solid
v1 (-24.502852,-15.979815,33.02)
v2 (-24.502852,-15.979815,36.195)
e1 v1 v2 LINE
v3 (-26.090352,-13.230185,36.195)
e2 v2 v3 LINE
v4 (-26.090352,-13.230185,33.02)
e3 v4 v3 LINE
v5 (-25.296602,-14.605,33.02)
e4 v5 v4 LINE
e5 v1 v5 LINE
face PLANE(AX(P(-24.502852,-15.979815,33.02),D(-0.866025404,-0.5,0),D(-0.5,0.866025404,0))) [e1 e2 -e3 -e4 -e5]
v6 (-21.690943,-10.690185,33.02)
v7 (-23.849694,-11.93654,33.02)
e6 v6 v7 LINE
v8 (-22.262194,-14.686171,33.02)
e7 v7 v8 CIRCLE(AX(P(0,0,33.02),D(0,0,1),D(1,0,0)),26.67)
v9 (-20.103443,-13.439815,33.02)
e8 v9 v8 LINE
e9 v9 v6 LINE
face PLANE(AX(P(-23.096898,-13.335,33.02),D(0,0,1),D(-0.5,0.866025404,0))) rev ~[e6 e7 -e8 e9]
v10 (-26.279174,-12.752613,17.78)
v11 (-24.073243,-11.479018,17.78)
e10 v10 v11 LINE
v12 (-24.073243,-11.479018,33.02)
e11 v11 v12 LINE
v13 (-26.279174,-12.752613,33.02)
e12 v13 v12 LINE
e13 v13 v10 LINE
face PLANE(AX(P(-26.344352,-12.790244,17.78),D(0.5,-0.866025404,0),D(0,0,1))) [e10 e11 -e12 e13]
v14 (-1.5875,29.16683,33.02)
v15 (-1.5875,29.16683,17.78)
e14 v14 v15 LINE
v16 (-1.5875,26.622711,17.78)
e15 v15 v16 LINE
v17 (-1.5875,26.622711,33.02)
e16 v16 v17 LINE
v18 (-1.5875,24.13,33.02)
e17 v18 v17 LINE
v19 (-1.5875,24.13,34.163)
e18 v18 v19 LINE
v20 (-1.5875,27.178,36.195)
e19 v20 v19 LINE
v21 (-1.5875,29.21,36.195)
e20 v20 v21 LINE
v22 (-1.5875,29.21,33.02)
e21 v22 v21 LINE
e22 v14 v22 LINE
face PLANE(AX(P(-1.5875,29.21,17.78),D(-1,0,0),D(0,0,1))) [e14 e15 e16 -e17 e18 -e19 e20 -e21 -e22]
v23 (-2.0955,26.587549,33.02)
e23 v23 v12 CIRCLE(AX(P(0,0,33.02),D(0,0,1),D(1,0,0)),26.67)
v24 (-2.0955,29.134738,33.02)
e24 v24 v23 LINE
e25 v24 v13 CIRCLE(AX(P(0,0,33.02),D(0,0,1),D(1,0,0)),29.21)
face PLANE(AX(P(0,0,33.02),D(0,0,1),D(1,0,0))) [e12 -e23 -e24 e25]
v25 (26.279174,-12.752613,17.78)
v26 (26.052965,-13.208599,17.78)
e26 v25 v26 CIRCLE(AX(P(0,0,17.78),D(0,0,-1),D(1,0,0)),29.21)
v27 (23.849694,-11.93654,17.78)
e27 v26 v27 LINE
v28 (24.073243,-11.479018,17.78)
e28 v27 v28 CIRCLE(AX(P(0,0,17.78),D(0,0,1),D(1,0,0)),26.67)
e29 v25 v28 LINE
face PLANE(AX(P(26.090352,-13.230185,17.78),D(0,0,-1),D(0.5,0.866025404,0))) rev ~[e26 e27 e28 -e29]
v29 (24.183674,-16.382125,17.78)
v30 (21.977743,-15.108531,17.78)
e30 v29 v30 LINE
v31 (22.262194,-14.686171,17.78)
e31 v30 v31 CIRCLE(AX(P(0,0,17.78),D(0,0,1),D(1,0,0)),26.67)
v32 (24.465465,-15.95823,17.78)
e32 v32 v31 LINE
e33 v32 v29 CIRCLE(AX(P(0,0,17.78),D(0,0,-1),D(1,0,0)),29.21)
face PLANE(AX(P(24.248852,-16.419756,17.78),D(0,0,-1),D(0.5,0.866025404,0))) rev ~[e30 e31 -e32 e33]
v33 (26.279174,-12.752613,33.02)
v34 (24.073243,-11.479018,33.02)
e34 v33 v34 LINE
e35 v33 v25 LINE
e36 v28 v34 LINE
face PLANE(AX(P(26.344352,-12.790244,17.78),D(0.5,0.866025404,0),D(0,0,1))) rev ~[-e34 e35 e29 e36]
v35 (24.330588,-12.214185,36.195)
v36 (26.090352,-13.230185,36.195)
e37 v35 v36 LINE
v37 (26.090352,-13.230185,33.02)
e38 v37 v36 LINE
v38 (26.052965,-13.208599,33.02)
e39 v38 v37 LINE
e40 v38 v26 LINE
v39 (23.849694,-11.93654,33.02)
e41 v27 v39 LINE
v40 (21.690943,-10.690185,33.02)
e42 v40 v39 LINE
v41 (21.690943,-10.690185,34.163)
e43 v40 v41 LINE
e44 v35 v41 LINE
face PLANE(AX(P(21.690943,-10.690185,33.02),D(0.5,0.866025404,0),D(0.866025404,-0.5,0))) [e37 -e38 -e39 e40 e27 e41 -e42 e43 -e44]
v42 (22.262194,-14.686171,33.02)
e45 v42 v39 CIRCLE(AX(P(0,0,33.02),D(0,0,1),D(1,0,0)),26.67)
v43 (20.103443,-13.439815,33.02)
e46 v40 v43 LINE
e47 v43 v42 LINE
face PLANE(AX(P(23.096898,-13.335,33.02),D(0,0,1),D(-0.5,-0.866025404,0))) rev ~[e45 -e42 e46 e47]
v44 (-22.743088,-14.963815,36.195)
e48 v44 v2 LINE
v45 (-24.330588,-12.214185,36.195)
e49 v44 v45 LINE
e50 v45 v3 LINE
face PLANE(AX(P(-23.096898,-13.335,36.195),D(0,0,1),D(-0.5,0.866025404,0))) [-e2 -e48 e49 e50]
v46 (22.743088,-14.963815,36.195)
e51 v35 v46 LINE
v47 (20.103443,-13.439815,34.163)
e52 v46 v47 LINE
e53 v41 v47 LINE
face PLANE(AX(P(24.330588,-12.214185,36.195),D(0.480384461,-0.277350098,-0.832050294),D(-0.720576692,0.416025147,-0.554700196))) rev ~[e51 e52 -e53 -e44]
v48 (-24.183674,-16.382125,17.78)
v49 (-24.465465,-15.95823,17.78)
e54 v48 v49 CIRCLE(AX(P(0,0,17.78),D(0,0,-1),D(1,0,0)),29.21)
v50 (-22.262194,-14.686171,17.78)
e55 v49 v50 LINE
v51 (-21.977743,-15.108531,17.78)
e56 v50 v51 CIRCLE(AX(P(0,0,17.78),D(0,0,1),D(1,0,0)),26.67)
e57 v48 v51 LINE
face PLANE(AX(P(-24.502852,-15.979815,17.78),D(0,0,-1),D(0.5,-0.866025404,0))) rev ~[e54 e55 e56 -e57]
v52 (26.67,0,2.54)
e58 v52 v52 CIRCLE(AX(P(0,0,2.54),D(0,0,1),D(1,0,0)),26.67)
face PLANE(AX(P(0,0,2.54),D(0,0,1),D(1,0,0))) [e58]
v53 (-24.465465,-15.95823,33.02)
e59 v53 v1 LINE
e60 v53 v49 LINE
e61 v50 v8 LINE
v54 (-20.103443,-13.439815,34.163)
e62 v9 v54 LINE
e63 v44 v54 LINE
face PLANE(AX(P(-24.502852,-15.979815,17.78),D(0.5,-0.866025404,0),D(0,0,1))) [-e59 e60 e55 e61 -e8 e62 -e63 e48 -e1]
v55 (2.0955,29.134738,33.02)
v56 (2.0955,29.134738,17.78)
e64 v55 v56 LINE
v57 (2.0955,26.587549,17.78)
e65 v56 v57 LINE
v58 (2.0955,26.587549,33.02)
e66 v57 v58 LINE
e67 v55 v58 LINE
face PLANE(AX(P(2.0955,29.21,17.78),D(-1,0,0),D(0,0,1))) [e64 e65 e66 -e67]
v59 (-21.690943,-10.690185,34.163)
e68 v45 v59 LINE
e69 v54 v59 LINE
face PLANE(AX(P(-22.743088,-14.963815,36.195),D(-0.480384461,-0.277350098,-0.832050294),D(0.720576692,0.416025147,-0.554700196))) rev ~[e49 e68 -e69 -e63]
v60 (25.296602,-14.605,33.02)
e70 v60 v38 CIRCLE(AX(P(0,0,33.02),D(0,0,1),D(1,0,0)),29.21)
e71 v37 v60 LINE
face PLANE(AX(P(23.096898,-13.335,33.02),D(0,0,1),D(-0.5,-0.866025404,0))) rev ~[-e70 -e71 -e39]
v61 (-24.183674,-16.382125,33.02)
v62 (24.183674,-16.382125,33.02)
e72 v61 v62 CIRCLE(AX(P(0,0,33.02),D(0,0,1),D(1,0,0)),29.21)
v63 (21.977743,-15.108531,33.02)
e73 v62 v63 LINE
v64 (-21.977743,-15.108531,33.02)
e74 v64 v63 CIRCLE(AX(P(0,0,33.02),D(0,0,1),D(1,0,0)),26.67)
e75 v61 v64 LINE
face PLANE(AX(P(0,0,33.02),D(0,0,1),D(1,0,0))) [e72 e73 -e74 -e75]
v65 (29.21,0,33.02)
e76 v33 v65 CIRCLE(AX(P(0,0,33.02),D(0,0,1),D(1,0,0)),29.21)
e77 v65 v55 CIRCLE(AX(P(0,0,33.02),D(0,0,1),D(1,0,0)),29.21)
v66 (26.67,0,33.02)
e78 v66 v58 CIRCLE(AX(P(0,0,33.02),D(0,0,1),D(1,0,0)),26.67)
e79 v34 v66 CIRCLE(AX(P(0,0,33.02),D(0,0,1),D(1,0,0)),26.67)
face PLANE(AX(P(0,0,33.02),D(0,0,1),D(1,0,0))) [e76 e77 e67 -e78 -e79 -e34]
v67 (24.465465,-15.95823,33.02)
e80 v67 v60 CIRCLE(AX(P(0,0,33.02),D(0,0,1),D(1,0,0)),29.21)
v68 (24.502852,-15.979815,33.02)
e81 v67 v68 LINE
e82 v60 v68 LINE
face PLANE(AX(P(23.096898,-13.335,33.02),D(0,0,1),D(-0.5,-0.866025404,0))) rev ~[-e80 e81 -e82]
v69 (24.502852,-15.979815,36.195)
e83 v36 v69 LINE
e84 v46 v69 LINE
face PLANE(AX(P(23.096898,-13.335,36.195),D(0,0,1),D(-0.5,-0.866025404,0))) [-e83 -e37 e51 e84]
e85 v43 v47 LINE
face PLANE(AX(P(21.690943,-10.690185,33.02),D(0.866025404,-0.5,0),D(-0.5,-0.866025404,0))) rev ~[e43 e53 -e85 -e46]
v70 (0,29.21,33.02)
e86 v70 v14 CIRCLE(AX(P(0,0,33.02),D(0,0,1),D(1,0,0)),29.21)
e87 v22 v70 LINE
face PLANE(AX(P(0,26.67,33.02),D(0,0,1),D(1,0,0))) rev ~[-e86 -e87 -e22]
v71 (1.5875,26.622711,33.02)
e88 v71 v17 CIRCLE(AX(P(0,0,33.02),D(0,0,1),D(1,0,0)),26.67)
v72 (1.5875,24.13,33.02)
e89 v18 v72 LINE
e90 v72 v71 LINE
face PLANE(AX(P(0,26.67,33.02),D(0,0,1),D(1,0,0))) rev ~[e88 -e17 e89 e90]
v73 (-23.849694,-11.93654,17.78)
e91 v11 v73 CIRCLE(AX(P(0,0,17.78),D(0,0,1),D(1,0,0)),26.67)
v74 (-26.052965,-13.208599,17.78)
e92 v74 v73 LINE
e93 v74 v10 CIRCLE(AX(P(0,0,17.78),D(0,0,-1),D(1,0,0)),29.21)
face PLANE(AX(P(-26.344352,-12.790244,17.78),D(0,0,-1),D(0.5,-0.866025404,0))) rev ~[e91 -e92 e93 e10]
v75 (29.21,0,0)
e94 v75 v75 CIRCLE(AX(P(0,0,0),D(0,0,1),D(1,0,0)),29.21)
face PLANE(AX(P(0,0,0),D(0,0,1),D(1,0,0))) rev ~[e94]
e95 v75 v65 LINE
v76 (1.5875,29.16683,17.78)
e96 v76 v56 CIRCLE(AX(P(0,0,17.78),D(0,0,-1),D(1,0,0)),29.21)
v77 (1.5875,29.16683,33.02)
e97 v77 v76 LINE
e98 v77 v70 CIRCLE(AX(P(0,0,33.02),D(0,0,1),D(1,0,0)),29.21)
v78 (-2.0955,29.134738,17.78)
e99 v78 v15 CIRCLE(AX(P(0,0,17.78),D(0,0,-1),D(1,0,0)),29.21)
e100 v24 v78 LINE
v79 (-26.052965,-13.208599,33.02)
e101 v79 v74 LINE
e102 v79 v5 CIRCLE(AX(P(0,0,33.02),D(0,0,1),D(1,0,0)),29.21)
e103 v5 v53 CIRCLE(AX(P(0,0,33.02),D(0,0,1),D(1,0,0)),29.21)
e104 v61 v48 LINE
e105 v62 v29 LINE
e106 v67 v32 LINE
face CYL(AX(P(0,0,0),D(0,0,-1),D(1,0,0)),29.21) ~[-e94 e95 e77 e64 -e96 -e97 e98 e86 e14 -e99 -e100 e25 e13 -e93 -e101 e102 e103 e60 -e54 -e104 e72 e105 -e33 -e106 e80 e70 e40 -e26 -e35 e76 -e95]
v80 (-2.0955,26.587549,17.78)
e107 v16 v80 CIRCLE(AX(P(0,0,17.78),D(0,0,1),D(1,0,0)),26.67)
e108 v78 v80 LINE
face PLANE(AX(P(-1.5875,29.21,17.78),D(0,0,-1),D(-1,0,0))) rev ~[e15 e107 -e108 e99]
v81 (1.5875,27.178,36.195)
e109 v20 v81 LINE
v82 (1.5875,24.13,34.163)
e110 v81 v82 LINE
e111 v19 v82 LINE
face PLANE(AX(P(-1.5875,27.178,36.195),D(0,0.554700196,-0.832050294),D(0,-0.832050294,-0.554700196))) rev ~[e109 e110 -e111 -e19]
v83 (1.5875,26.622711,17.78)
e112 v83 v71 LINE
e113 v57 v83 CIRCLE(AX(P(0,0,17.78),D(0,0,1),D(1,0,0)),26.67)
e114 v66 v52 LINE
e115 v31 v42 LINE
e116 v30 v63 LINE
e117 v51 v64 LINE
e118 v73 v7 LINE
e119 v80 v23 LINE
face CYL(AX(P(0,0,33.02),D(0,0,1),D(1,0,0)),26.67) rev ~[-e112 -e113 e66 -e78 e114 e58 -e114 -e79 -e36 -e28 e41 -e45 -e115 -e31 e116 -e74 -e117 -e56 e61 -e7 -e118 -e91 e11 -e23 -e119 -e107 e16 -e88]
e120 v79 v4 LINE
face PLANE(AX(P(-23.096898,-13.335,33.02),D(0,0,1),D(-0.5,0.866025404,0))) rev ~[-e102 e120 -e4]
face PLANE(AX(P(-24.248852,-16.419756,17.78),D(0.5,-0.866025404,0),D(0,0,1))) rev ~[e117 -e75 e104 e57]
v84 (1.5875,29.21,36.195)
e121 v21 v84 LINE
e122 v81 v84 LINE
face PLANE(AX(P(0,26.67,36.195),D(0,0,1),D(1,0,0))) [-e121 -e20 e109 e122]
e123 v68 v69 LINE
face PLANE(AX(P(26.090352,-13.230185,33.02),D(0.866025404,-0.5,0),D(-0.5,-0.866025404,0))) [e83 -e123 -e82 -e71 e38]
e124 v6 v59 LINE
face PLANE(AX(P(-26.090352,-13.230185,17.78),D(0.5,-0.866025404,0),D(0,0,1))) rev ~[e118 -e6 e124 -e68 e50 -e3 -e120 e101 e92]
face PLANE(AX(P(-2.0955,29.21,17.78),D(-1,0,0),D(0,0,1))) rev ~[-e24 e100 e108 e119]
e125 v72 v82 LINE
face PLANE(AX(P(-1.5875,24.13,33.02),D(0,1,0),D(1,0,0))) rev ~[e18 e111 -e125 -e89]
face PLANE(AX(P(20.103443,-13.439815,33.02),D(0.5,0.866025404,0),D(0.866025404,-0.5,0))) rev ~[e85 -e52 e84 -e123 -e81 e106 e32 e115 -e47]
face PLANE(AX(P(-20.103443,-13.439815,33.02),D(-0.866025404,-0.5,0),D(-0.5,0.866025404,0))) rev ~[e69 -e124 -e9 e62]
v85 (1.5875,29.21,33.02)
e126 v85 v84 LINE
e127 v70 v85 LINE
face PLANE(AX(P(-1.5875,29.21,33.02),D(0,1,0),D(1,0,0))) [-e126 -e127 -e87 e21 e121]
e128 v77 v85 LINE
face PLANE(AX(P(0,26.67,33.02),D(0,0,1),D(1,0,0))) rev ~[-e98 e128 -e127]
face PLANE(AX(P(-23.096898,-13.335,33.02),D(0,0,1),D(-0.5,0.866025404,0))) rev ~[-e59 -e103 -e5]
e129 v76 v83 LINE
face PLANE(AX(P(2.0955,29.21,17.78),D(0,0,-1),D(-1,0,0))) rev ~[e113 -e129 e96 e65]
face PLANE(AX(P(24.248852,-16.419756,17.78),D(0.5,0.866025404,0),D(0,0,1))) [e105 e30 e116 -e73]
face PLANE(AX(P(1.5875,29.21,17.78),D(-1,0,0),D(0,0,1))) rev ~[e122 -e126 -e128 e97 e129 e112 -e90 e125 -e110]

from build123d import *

# Parameters (mm, degrees)
F0_R            = 29.21
F1_DEPTH        = 33.02
F2_R            = 26.67
F3_DEPTH        = 30.48
F4_W            = 3.175
F4_H            = 5.08
F5_DEPTH        = 3.175
F5_COPIES_COUNT = 3
F7_DEPTH        = 3.175
F7_COPIES_COUNT = 3
F8_W            = 0.508
F8_H            = 15.24
F9_DEPTH        = 5.08
F9_COPIES_COUNT = 3


# Not quite as in the source:
# - a pattern or mirror of a feature is missing from the dataset's text; its kind, count and spacing are read off the source's solid


with BuildPart() as f1:
    # F0 (on Top) → F1 (new body)
    with BuildSketch(Plane.XY):
        Circle(F0_R)
    extrude(amount=F1_DEPTH)

    # F2 (on face) → F3 (cut)
    with BuildSketch(Plane.XY.offset(33.02)):
        Circle(F2_R)
    extrude(amount=-F3_DEPTH, mode=Mode.SUBTRACT)

    # F4 (on face) → F5 (join)
    with BuildSketch(Plane.XY.offset(33.02)):
        with Locations((0, 26.67)):
            Rectangle(F4_W, F4_H)
    f5 = extrude(amount=F5_DEPTH)

    # F5_copies: F5 ×3 about axis
    f5_copies_axis = Axis((0, 0, 0), (0, 0, 1))
    for i in range(1, F5_COPIES_COUNT):
        add(f5.rotate(f5_copies_axis, i * 360 / F5_COPIES_COUNT))

    # F6 (on face) → F7 (cut, through all)
    with BuildSketch(Plane(origin=(-1.5875, 0, 0), x_dir=(0, -1, 0), z_dir=(-1, 0, 0))):
        Polygon((-24.13, 36.195), (-27.178, 36.195), (-24.13, 34.163), align=None)
    f7 = extrude(amount=-F7_DEPTH, mode=Mode.SUBTRACT)

    # F7_copies: F7 ×3 about axis
    f7_copies_axis = Axis((0, 0, 0), (0, 0, 1))
    for i in range(1, F7_COPIES_COUNT):
        add(f7.rotate(f7_copies_axis, i * 360 / F7_COPIES_COUNT), mode=Mode.SUBTRACT)

    # F8 (on face) → F9 (cut)
    with BuildSketch(Plane(origin=(0, 29.21, 0), x_dir=(-1, 0, 0), z_dir=(0, 1, 0))):
        with Locations((1.8415, 25.4)):
            Rectangle(F8_W, F8_H)
        with Locations((-1.8415, 25.4)):
            Rectangle(F8_W, F8_H)
    f9 = extrude(amount=-F9_DEPTH, mode=Mode.SUBTRACT)

    # F9_copies: F9 ×3 about axis
    f9_copies_axis = Axis((0, 0, 0), (0, 0, 1))
    for i in range(1, F9_COPIES_COUNT):
        add(f9.rotate(f9_copies_axis, i * 360 / F9_COPIES_COUNT), mode=Mode.SUBTRACT)


solid = f1.part
